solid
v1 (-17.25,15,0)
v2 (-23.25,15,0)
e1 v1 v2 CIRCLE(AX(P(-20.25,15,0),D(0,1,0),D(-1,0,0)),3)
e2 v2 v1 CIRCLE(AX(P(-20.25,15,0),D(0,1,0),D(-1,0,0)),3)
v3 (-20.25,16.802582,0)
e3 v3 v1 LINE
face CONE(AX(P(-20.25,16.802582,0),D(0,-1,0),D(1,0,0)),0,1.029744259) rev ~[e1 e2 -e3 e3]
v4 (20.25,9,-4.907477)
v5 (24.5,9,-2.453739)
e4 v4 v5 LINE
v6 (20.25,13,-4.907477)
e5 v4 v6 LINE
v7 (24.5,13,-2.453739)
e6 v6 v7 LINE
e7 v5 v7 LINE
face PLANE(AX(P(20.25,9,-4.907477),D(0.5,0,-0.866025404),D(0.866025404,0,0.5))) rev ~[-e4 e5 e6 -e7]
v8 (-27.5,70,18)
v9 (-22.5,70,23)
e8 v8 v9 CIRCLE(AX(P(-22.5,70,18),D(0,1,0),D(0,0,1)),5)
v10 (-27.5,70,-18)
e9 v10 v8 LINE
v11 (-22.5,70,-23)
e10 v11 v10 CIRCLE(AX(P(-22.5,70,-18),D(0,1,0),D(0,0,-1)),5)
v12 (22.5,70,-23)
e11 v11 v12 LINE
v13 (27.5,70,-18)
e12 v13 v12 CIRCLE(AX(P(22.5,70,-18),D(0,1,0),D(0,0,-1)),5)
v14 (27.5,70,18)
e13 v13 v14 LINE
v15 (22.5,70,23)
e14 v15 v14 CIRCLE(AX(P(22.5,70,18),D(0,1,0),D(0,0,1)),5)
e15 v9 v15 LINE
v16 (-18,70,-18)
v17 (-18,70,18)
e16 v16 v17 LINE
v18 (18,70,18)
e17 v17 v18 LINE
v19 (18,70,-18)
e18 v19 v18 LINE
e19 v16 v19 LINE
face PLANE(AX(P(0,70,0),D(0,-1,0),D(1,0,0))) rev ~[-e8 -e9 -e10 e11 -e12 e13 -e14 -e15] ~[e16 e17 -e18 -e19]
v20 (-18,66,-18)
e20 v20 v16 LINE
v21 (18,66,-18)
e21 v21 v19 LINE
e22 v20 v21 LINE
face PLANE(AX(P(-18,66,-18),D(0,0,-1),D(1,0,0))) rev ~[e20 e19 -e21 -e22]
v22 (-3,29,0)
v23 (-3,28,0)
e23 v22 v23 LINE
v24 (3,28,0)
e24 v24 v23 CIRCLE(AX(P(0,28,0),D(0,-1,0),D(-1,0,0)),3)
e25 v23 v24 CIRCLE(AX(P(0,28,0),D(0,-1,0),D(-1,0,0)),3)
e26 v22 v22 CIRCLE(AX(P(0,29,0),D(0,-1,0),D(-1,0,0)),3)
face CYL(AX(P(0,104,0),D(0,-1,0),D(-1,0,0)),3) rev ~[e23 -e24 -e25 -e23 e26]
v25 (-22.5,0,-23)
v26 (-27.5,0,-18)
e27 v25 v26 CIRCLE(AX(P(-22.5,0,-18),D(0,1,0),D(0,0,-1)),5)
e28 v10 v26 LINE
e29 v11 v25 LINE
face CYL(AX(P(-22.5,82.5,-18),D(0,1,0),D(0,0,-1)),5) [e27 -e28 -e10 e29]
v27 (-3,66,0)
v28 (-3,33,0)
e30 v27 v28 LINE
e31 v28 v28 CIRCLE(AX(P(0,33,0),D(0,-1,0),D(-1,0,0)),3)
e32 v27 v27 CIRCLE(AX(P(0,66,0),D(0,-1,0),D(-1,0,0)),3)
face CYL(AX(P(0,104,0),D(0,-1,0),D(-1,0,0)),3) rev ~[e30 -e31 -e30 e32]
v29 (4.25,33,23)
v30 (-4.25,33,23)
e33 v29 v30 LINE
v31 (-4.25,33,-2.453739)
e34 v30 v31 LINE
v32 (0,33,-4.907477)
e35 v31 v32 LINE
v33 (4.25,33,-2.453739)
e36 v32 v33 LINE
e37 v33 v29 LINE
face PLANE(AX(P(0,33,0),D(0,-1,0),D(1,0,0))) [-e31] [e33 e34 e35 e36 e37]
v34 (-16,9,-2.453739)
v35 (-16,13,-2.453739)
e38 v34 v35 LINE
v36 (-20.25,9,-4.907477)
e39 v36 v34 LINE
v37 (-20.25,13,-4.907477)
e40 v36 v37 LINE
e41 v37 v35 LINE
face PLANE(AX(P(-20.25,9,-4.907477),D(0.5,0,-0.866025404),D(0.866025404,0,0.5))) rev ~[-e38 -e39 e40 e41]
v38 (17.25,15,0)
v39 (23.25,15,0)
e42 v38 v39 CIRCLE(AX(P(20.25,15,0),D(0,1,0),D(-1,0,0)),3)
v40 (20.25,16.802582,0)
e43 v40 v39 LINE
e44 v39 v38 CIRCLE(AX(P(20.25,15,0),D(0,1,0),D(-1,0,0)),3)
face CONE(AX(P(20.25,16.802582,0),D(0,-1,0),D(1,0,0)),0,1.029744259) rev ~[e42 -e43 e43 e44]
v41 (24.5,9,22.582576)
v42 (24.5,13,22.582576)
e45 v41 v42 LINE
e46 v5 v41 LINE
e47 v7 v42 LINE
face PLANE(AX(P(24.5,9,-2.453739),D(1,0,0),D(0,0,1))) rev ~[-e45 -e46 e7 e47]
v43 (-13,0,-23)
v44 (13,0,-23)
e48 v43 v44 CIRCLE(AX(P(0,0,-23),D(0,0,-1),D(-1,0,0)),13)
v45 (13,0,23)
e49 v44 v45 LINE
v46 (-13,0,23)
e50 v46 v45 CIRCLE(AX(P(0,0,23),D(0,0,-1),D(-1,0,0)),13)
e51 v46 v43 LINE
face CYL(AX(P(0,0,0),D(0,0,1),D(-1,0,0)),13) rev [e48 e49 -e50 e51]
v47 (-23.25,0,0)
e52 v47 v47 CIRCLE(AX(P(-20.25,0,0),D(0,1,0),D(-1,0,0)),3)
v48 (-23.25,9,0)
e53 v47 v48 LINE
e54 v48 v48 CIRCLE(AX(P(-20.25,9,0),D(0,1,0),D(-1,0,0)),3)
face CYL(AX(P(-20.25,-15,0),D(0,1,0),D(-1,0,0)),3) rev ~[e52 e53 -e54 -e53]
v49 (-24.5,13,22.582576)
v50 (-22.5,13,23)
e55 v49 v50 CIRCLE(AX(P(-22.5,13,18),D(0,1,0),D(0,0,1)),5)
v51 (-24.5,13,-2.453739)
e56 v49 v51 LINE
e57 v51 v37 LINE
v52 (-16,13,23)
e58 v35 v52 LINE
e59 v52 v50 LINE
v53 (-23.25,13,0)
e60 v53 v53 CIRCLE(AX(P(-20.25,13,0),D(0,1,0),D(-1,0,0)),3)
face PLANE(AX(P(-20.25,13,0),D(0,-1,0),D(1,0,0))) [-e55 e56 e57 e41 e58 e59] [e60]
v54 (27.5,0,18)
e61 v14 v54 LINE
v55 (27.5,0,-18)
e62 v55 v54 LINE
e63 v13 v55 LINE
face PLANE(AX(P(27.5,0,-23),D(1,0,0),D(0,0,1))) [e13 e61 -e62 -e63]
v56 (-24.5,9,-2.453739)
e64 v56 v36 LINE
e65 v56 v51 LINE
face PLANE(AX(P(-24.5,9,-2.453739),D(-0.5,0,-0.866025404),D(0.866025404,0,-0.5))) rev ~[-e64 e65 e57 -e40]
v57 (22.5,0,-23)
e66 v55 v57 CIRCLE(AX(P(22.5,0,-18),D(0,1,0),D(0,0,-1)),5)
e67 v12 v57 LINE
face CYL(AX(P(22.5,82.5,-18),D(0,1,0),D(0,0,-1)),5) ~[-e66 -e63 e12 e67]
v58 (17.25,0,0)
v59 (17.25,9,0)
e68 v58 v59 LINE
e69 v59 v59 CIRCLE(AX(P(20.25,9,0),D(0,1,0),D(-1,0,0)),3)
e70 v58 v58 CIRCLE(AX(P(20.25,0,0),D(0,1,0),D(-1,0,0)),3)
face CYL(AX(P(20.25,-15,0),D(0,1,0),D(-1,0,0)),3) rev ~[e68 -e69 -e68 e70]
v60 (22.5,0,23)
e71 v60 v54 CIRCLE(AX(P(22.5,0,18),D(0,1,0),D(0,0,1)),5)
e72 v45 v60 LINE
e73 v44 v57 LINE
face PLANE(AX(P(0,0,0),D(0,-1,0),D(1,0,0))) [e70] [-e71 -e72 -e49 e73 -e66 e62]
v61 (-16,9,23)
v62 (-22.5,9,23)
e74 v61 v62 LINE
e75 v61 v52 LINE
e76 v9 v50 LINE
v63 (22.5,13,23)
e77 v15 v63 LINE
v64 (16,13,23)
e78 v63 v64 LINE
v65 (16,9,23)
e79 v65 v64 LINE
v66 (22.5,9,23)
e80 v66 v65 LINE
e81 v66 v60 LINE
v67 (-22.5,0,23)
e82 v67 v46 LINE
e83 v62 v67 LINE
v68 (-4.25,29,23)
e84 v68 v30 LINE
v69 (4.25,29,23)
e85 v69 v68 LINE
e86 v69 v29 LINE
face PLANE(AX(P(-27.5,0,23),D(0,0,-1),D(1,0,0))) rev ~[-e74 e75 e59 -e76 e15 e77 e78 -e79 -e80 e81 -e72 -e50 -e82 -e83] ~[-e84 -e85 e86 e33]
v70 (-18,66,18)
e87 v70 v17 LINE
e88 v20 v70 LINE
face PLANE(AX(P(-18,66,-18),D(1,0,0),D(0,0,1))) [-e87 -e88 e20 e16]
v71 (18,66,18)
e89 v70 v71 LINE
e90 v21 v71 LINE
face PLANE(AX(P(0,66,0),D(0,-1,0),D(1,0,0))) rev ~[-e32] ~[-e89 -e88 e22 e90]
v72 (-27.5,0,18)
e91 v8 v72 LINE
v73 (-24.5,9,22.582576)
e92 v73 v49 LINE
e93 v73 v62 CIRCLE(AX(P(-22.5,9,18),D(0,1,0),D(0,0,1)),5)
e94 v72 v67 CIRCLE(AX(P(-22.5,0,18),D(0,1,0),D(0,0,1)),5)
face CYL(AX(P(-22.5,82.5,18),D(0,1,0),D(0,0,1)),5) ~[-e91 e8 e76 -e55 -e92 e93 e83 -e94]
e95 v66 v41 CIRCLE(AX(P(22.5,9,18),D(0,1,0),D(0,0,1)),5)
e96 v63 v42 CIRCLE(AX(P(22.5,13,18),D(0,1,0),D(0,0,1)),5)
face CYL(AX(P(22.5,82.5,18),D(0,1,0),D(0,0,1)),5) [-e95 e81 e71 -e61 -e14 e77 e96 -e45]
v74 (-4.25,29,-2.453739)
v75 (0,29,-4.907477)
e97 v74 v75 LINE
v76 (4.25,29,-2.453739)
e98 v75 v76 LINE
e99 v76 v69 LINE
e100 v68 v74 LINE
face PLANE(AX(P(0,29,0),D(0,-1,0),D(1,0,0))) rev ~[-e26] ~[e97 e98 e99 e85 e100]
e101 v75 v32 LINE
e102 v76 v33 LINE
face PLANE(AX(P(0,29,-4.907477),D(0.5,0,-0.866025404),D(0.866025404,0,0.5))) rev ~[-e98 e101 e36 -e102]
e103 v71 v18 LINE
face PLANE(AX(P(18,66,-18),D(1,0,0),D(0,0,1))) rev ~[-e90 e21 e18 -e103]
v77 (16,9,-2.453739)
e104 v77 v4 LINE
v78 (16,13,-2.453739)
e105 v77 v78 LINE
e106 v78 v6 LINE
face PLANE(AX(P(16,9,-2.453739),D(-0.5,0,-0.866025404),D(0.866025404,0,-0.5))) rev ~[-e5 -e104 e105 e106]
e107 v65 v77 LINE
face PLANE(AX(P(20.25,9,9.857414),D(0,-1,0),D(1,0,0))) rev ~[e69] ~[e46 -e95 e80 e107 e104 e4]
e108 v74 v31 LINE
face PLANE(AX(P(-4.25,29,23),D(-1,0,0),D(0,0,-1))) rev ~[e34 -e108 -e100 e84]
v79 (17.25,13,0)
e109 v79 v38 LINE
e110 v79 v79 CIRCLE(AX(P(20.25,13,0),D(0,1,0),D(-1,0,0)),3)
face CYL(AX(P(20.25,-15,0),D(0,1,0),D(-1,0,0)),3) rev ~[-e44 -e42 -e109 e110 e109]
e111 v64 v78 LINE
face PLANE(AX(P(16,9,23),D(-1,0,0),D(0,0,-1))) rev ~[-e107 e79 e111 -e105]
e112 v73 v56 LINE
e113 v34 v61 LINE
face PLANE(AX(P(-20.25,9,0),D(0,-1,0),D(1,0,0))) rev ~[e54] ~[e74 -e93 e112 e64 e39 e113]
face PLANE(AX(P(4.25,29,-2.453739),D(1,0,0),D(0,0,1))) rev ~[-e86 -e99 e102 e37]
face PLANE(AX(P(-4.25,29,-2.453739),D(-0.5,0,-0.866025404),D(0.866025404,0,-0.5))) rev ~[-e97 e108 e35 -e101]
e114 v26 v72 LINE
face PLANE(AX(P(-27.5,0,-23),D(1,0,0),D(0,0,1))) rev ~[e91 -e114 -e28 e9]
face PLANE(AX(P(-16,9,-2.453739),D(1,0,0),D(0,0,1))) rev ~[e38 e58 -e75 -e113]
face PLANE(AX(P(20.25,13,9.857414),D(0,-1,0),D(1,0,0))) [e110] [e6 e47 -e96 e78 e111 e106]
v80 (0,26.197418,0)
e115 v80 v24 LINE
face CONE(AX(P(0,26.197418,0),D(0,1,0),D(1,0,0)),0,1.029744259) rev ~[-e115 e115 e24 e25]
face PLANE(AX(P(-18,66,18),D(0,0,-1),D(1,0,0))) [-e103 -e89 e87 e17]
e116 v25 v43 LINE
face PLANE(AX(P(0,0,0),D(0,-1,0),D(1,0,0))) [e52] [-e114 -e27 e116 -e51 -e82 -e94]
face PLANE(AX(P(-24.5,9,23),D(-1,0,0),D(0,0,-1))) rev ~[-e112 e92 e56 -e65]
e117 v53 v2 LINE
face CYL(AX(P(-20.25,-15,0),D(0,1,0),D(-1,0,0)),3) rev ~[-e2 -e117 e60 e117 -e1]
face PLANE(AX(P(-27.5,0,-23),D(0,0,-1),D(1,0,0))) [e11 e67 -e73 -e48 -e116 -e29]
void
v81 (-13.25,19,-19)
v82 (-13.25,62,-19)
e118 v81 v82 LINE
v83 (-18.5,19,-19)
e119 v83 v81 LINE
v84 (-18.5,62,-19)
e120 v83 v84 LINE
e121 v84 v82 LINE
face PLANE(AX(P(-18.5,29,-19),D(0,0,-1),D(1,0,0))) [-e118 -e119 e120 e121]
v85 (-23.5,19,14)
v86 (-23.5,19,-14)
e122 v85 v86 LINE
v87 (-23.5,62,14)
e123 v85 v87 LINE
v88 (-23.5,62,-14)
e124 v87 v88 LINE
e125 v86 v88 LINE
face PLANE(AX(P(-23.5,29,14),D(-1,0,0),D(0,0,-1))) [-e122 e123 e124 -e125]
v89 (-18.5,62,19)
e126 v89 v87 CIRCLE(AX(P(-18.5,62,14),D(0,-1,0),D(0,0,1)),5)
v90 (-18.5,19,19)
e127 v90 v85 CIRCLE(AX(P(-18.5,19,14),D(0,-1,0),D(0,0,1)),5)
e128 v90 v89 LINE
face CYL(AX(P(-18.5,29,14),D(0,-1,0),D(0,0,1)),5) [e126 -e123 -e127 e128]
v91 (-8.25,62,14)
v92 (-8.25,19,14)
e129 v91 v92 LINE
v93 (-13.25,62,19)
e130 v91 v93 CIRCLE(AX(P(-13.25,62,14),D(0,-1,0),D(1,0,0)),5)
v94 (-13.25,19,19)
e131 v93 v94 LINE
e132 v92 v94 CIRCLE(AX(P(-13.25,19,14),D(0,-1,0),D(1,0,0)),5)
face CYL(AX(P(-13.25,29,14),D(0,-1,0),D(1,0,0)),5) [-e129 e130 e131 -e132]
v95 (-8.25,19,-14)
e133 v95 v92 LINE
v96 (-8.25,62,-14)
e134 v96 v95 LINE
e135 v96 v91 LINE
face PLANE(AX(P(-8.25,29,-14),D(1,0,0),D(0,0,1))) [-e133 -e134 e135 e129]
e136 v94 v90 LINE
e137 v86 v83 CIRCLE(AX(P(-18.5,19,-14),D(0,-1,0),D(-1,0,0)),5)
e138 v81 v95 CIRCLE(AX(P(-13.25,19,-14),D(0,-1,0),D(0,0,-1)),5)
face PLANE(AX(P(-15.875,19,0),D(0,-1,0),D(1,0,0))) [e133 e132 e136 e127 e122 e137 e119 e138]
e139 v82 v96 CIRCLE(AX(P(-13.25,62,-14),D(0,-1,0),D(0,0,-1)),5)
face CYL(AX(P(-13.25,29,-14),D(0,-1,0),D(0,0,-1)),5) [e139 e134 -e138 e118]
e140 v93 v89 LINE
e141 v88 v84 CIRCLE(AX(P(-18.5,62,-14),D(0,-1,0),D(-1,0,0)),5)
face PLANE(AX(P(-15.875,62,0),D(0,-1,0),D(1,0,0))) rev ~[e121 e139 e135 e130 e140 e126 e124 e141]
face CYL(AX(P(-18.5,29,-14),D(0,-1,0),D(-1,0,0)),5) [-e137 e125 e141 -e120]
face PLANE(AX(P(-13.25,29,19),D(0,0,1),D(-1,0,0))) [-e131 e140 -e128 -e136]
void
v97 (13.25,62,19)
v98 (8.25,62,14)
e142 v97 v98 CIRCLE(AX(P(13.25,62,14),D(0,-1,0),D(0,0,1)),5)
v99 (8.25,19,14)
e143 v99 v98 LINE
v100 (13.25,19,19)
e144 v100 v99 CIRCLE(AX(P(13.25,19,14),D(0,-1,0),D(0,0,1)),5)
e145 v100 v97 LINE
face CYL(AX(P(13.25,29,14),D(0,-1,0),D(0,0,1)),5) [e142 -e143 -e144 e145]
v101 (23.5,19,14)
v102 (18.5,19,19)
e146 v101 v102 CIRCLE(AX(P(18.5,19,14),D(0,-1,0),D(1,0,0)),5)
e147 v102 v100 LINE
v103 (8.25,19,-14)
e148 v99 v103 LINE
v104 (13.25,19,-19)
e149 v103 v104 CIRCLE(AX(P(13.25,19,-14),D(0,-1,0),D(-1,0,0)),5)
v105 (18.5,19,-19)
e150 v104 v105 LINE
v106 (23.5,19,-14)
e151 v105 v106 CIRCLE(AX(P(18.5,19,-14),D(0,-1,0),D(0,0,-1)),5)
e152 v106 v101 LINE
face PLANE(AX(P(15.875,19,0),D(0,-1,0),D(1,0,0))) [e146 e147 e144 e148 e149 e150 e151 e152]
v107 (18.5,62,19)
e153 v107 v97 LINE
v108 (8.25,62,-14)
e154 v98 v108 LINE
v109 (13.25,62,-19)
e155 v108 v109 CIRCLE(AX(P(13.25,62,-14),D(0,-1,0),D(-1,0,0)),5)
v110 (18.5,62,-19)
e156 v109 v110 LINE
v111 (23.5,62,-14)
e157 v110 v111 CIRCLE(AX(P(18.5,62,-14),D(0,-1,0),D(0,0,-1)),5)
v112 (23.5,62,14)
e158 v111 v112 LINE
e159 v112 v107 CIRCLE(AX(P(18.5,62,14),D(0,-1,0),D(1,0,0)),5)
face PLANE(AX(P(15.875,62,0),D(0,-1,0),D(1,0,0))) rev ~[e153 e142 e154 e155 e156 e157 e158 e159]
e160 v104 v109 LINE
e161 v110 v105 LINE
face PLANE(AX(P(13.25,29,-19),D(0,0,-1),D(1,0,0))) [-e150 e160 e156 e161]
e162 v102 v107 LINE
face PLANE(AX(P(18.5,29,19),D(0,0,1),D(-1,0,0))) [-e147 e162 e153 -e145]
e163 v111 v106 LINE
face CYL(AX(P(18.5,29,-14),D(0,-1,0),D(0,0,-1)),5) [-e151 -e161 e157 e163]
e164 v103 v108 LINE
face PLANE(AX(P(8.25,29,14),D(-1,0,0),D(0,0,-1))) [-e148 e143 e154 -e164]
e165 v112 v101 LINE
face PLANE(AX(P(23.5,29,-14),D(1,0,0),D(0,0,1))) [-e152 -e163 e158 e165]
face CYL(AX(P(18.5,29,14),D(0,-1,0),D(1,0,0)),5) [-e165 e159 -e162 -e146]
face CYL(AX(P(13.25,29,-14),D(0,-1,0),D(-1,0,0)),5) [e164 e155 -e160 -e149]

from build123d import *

# Parameters (mm, degrees)
F0_W         = 55
F0_H         = 46
F5_DEPTH     = 70
F1_W         = 7.25
F1_H         = 70
F6_DEPTH     = 23
F7_D         = 6
F7_DEPTH     = 15
F7_TIP       = 1.8025818571
F9_DEPTH     = 4
F10_W        = 36
F10_H        = 36
F11_DEPTH    = 4
F12_D        = 6
F12_DEPTH    = 38
F12_TIP      = 1.8025818571
F14_DEPTH    = 4
F15_T1_DEPTH = 95
F16_DEPTH    = 33
F17_DEPTH    = 10


# Not quite as in the source:
# - a fillet or chamfer that OpenCascade refuses, or shapes differently, is made with other operations: its cross-section is extruded or revolved along the edge and cut away or added


with BuildPart() as f5:
    # F0 (on Front) → F5 (new body)
    with BuildSketch(Plane.XZ):
        Rectangle(F0_W, F0_H)
    extrude(amount=-F5_DEPTH)

    # F1 (on Top) → F6 (intersect, symmetric)
    with BuildSketch(Plane.XY):
        with BuildLine():
            Line((-20.25, 0), (-13, 0))
            ThreePointArc((-13, 0), (0, 13), (13, 0))
            Line((13, 0), (20.25, 0))
            Line((20.25, 0), (20.25, 70))
            Line((20.25, 70), (-20.25, 70))
            Line((-20.25, 70), (-20.25, 0))
        make_face()
        with Locations((-23.875, 35)):
            Rectangle(F1_W, F1_H)
        with Locations((23.875, 35)):
            Rectangle(F1_W, F1_H)
    extrude(amount=F6_DEPTH, both=True, mode=Mode.INTERSECT)

    # F7
    with Locations(Plane.XZ):
        with Locations((-20.25, 0), (20.25, 0)):
            Hole(F7_D / 2, depth=F7_DEPTH)
            with Locations((0, 0, -(F7_DEPTH + F7_TIP / 2))):  # 118° drill point
                Cone(0, F7_D / 2, F7_TIP, mode=Mode.SUBTRACT)

    # F8 (on offset) → F9 (cut)
    with BuildSketch(Plane.XZ.offset(-9)):
        Polygon((-24.5, 2.4537386441), (-24.5, 2.25), (-24.5, -2.4537386441), (-20.25, -4.9074772881), (-16, -2.4537386441), (-16, 2), (-16, 2.4537386441), (-20.25, 4.9074772881), align=None)
        Polygon((-24.5, 23), (-24.5, 2.4537386441), (-20.25, 4.9074772881), (-16, 2.4537386441), (-16, 23), align=None)
        Polygon((24.5, 2.4537386441), (24.5, 23), (16, 23), (16, 2.4537386441), (16, 2), (16, -2.4537386441), (20.25, -4.9074772881), (24.5, -2.4537386441), (24.5, 2.25), align=None)
    extrude(amount=-F9_DEPTH, mode=Mode.SUBTRACT)

    # F10 (on offset) → F11 (cut)
    with BuildSketch(Plane.XZ.offset(-66)):
        Rectangle(F10_W, F10_H)
    extrude(amount=-F11_DEPTH, mode=Mode.SUBTRACT)

    # F12
    with Locations(Plane(origin=(0, 66, 0), x_dir=(1, 0, 0), z_dir=(0, 1, 0))):
        with Locations((0, 0)):
            Hole(F12_D / 2, depth=F12_DEPTH)
            with Locations((0, 0, -(F12_DEPTH + F12_TIP / 2))):  # 118° drill point
                Cone(0, F12_D / 2, F12_TIP, mode=Mode.SUBTRACT)

    # F13 (on offset) → F14 (cut)
    with BuildSketch(Plane.XZ.offset(-29)):
        Polygon((-4.25, 2.4537386441), (-4.25, 2.25), (-4.25, -2.4537386441), (0, -4.9074772881), (4.25, -2.4537386441), (4.25, 2.0686155439), (4.25, 2.4537386441), (0, 4.9074772881), align=None)
        Polygon((-4.25, 23), (-4.25, 2.4537386441), (0, 4.9074772881), (4.25, 2.4537386441), (4.25, 23), align=None)
        with BuildLine():
            ThreePointArc((23.5, 14), (22.0355339059, 17.5355339059), (18.5, 19))
            Line((18.5, 19), (13.25, 19))
            ThreePointArc((13.25, 19), (9.7144660941, 17.5355339059), (8.25, 14))
            Line((8.25, 14), (8.25, -14))
            ThreePointArc((8.25, -14), (9.7144660941, -17.5355339059), (13.25, -19))
            Line((13.25, -19), (18.5, -19))
            ThreePointArc((18.5, -19), (22.0355339059, -17.5355339059), (23.5, -14))
            Line((23.5, -14), (23.5, 14))
        make_face()
        with BuildLine():
            Line((-13.25, 19), (-18.5, 19))
            ThreePointArc((-18.5, 19), (-22.0355339059, 17.5355339059), (-23.5, 14))
            Line((-23.5, 14), (-23.5, -14))
            ThreePointArc((-23.5, -14), (-22.0355339059, -17.5355339059), (-18.5, -19))
            Line((-18.5, -19), (-13.25, -19))
            ThreePointArc((-13.25, -19), (-9.7144660941, -17.5355339059), (-8.25, -14))
            Line((-8.25, -14), (-8.25, 14))
            ThreePointArc((-8.25, 14), (-9.7144660941, 17.5355339059), (-13.25, 19))
        make_face()
    extrude(amount=-F14_DEPTH, mode=Mode.SUBTRACT)

    # F15: fillet of radius 5 on 4 edges, made by hand

    # F15_s2 → F15_t1 (cut)
    with BuildSketch(Plane.XZ.offset(-82.5)):
        with BuildLine():
            ThreePointArc((-22.5, 23), (-26.0355339059, 21.5355339059), (-27.5, 18))
            Line((-27.5, 18), (-27.5, 23))
            Line((-27.5, 23), (-22.5, 23))
        make_face()
        with BuildLine():
            ThreePointArc((22.5, 23), (26.0355339059, 21.5355339059), (27.5, 18))
            Line((27.5, 18), (27.5, 23))
            Line((27.5, 23), (22.5, 23))
        make_face()
        with BuildLine():
            ThreePointArc((-22.5, -23), (-26.0355339059, -21.5355339059), (-27.5, -18))
            Line((-27.5, -18), (-27.5, -23))
            Line((-27.5, -23), (-22.5, -23))
        make_face()
        with BuildLine():
            ThreePointArc((22.5, -23), (26.0355339059, -21.5355339059), (27.5, -18))
            Line((27.5, -18), (27.5, -23))
            Line((27.5, -23), (22.5, -23))
        make_face()
    extrude(amount=F15_T1_DEPTH, mode=Mode.SUBTRACT)

    # F13 (on offset) → F16 (cut)
    with BuildSketch(Plane.XZ.offset(-29)):
        with BuildLine():
            ThreePointArc((23.5, 14), (22.0355339059, 17.5355339059), (18.5, 19))
            Line((18.5, 19), (13.25, 19))
            ThreePointArc((13.25, 19), (9.7144660941, 17.5355339059), (8.25, 14))
            Line((8.25, 14), (8.25, -14))
            ThreePointArc((8.25, -14), (9.7144660941, -17.5355339059), (13.25, -19))
            Line((13.25, -19), (18.5, -19))
            ThreePointArc((18.5, -19), (22.0355339059, -17.5355339059), (23.5, -14))
            Line((23.5, -14), (23.5, 14))
        make_face()
        with BuildLine():
            Line((-13.25, 19), (-18.5, 19))
            ThreePointArc((-18.5, 19), (-22.0355339059, 17.5355339059), (-23.5, 14))
            Line((-23.5, 14), (-23.5, -14))
            ThreePointArc((-23.5, -14), (-22.0355339059, -17.5355339059), (-18.5, -19))
            Line((-18.5, -19), (-13.25, -19))
            ThreePointArc((-13.25, -19), (-9.7144660941, -17.5355339059), (-8.25, -14))
            Line((-8.25, -14), (-8.25, 14))
            ThreePointArc((-8.25, 14), (-9.7144660941, 17.5355339059), (-13.25, 19))
        make_face()
    extrude(amount=-F16_DEPTH, mode=Mode.SUBTRACT)

    # F13 (on offset) → F17 (cut)
    with BuildSketch(Plane.XZ.offset(-29)):
        with BuildLine():
            ThreePointArc((23.5, 14), (22.0355339059, 17.5355339059), (18.5, 19))
            Line((18.5, 19), (13.25, 19))
            ThreePointArc((13.25, 19), (9.7144660941, 17.5355339059), (8.25, 14))
            Line((8.25, 14), (8.25, -14))
            ThreePointArc((8.25, -14), (9.7144660941, -17.5355339059), (13.25, -19))
            Line((13.25, -19), (18.5, -19))
            ThreePointArc((18.5, -19), (22.0355339059, -17.5355339059), (23.5, -14))
            Line((23.5, -14), (23.5, 14))
        make_face()
        with BuildLine():
            Line((-13.25, 19), (-18.5, 19))
            ThreePointArc((-18.5, 19), (-22.0355339059, 17.5355339059), (-23.5, 14))
            Line((-23.5, 14), (-23.5, -14))
            ThreePointArc((-23.5, -14), (-22.0355339059, -17.5355339059), (-18.5, -19))
            Line((-18.5, -19), (-13.25, -19))
            ThreePointArc((-13.25, -19), (-9.7144660941, -17.5355339059), (-8.25, -14))
            Line((-8.25, -14), (-8.25, 14))
            ThreePointArc((-8.25, 14), (-9.7144660941, 17.5355339059), (-13.25, 19))
        make_face()
    extrude(amount=F17_DEPTH, mode=Mode.SUBTRACT)


solid = f5.part
